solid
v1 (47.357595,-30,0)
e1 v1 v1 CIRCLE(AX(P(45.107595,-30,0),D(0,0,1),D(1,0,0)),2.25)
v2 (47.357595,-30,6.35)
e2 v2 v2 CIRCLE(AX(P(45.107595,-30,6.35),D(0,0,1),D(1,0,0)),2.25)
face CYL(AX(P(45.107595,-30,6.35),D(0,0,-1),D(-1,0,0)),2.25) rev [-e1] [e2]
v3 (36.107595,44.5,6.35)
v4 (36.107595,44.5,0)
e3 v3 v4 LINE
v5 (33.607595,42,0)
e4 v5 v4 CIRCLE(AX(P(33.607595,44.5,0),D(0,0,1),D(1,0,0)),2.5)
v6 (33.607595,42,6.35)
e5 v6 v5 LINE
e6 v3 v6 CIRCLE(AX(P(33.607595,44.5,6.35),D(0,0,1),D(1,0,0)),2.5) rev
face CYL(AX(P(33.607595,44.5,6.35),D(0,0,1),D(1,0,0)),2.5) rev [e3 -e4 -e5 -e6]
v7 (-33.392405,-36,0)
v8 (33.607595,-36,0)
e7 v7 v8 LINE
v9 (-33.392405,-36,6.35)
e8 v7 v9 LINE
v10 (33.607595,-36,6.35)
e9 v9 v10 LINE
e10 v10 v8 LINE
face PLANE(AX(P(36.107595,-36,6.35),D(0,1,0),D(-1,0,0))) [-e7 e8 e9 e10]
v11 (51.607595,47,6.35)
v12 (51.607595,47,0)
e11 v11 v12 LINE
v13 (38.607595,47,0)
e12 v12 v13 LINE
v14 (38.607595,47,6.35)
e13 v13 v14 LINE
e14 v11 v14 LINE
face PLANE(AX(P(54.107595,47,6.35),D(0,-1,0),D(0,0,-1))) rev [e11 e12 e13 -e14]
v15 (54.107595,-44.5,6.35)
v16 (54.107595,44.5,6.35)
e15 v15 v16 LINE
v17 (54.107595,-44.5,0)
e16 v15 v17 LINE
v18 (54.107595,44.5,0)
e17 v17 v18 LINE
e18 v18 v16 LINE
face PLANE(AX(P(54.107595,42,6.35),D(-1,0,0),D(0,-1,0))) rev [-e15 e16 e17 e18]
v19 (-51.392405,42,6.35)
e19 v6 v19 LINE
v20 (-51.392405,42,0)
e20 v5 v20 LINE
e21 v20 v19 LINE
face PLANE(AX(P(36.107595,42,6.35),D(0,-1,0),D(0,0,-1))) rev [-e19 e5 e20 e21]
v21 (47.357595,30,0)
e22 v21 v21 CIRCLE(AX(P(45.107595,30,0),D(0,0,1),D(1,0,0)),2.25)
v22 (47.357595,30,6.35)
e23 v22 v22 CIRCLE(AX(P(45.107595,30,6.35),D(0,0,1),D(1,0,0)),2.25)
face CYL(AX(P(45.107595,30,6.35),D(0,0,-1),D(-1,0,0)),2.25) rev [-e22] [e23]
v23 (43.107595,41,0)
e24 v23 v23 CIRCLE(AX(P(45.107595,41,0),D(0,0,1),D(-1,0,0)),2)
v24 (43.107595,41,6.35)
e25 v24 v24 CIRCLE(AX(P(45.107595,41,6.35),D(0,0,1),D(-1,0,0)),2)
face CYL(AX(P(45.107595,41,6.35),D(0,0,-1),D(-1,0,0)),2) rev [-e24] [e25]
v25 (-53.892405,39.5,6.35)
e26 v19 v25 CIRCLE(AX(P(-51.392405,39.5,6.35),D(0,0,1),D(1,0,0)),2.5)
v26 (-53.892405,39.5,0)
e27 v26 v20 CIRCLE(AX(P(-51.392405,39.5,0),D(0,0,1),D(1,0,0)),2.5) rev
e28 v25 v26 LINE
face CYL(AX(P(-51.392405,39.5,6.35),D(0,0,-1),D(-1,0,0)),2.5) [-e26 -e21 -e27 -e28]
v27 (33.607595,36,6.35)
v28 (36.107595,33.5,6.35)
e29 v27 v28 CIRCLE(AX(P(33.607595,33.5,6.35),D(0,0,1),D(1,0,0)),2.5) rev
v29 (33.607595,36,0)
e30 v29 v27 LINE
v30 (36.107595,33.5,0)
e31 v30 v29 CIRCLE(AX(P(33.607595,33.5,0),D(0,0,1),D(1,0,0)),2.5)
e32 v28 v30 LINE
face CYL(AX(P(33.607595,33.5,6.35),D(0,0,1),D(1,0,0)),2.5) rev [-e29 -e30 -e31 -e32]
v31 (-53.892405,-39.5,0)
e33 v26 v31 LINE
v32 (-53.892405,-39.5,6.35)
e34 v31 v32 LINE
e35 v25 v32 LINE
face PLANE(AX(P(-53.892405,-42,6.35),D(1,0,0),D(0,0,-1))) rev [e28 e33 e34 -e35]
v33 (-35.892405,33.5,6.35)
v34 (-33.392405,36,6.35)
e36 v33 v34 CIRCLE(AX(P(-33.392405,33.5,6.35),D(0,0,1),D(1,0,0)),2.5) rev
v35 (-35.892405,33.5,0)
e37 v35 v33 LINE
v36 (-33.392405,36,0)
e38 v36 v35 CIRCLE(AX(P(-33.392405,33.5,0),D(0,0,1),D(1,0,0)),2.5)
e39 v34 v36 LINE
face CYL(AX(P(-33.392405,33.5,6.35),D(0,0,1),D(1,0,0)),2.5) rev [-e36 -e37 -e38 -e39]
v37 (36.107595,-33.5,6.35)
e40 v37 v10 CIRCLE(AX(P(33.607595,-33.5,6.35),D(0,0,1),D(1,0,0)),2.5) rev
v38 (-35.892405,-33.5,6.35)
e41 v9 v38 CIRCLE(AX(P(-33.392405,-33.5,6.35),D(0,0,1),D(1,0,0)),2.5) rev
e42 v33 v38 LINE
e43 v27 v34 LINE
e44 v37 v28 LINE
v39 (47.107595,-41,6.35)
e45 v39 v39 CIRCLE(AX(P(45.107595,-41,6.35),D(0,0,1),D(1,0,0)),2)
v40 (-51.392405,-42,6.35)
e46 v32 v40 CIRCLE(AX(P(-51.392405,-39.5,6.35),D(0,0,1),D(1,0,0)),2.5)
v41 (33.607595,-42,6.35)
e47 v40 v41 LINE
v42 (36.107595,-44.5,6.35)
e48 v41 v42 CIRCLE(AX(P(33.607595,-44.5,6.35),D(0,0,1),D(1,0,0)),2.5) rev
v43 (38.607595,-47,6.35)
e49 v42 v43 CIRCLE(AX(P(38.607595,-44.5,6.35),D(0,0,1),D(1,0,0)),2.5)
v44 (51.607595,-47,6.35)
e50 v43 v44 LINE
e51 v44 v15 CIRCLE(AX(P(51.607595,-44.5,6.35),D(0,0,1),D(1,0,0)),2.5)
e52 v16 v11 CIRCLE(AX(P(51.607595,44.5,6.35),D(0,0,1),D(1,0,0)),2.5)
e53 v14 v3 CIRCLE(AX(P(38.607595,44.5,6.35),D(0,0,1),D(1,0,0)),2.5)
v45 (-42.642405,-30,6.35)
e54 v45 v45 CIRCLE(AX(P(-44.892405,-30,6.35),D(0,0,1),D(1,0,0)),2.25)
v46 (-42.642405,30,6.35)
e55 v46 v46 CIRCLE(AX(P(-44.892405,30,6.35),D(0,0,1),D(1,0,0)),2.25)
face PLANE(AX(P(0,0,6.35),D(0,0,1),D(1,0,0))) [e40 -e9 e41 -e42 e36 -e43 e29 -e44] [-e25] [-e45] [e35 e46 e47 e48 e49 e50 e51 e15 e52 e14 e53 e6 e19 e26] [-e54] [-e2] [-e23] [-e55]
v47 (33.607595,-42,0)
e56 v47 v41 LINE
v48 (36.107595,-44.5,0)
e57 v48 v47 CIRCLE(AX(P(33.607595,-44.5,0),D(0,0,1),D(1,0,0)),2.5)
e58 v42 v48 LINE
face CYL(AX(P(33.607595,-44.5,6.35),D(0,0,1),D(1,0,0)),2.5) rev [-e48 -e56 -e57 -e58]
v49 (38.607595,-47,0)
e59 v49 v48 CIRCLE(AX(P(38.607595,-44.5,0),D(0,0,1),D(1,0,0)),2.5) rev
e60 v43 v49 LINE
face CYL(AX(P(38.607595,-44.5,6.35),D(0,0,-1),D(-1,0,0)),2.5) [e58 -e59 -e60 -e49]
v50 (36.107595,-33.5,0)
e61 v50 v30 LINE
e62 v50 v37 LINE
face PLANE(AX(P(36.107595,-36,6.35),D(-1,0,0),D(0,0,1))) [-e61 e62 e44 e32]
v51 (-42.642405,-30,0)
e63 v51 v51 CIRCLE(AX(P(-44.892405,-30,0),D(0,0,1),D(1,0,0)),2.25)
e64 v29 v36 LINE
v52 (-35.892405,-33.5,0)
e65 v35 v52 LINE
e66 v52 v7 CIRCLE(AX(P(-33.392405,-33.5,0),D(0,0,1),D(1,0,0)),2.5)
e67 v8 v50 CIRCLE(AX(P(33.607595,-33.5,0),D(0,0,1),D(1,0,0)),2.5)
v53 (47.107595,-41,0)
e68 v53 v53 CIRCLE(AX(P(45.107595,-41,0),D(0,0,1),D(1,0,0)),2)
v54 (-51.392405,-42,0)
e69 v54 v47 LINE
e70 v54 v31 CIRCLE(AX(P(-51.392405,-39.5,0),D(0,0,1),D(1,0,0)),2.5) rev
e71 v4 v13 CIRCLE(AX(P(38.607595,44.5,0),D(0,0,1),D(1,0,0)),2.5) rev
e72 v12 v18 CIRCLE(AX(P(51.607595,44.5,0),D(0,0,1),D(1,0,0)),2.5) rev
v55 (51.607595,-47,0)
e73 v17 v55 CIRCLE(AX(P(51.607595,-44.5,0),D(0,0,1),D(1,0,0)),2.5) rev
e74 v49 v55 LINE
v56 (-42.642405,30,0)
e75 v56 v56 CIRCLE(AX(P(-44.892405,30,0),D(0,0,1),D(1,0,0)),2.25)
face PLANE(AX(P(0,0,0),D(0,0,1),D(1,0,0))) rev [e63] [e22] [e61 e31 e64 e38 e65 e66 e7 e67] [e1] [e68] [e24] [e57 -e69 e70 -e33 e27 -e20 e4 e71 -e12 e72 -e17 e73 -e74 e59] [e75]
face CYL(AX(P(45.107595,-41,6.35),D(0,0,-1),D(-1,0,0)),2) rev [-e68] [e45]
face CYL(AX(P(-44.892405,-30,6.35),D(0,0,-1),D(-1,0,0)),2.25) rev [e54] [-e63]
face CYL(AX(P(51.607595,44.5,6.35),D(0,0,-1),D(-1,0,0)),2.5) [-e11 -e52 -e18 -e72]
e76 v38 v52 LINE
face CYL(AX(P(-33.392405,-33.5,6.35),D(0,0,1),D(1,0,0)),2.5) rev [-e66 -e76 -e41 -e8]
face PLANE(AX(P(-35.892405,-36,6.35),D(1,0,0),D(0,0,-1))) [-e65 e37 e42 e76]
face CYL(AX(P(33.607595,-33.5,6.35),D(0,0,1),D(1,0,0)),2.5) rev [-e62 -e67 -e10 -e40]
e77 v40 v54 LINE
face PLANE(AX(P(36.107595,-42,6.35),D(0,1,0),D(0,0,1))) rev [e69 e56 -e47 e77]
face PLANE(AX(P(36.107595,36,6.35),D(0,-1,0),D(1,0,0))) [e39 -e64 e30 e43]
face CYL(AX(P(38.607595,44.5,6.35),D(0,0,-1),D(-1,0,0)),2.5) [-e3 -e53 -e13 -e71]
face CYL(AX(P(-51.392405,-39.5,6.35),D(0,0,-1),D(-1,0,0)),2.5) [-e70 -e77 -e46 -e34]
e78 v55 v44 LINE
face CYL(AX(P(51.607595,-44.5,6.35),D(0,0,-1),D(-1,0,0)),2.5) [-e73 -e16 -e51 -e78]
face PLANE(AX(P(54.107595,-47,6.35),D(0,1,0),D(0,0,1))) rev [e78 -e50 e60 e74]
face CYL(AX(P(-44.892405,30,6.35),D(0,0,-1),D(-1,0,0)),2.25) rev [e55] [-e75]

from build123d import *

# Parameters (mm, degrees)
SKETCH1_R           = 2.25
SKETCH1_R_2         = 2
SKETCH1_W           = 72
SKETCH1_H           = 72
BOSS_EXTRUDE1_DEPTH = 6.35
FILLET1_START       = -1
FILLET1_DEPTH       = 8
FILLET1_2_DEPTH     = 6.35


with BuildPart() as part:
    # Sketch1 → Boss-Extrude1 (new body)
    with BuildSketch(Plane.XY):
        Polygon((54.107594743, 42), (54.107594743, 47), (36.107594743, 47), (36.107594743, 42), (-53.892405257, 42), (-53.892405257, -42), (36.107594743, -42), (36.107594743, -47), (54.107594743, -47), (54.107594743, -42), align=None)
        with Locations((-44.892405257, 30)):
            Circle(SKETCH1_R, mode=Mode.SUBTRACT)
        with Locations((45.107594743, 30)):
            Circle(SKETCH1_R, mode=Mode.SUBTRACT)
        with Locations((45.107594743, -30)):
            Circle(SKETCH1_R, mode=Mode.SUBTRACT)
        with Locations((-44.892405257, -30)):
            Circle(SKETCH1_R, mode=Mode.SUBTRACT)
        with Locations((45.107594743, -41)):
            Circle(SKETCH1_R_2, mode=Mode.SUBTRACT)
        with Locations(Location((45.107594743, 41, 0), (0, 0, 180))):
            Circle(SKETCH1_R_2, mode=Mode.SUBTRACT)
        with Locations((0.107594743, 0)):
            Rectangle(SKETCH1_W, SKETCH1_H, mode=Mode.SUBTRACT)
    extrude(amount=BOSS_EXTRUDE1_DEPTH)

    # Fillet1: read off the stored shape, not the designer's step
    # Fillet1 outline → Fillet1 (cut)
    with BuildSketch(Plane.XY.offset(FILLET1_START)):
        with BuildLine():
            Line((36.107594743, 47), (36.107594743, 44.5))
            ThreePointArc((36.107594743, 44.5), (36.83982779, 46.267766953), (38.607594743, 47))
            Line((38.607594743, 47), (36.107594743, 47))
        make_face()
        with BuildLine():
            Line((54.107594743, 47), (51.607594743, 47))
            ThreePointArc((51.607594743, 47), (53.375361696, 46.267766953), (54.107594743, 44.5))
            Line((54.107594743, 44.5), (54.107594743, 47))
        make_face()
        with BuildLine():
            ThreePointArc((-53.892405257, 39.5), (-53.16017221, 41.267766953), (-51.392405257, 42))
            Line((-51.392405257, 42), (-53.892405257, 42))
            Line((-53.892405257, 42), (-53.892405257, 39.5))
        make_face()
        with BuildLine():
            Line((54.107594743, -47), (54.107594743, -44.5))
            ThreePointArc((54.107594743, -44.5), (53.375361696, -46.267766953), (51.607594743, -47))
            Line((51.607594743, -47), (54.107594743, -47))
        make_face()
        with BuildLine():
            ThreePointArc((-51.392405257, -42), (-53.16017221, -41.267766953), (-53.892405257, -39.5))
            Line((-53.892405257, -39.5), (-53.892405257, -42))
            Line((-53.892405257, -42), (-51.392405257, -42))
        make_face()
        with BuildLine():
            Line((36.107594743, -47), (38.607594743, -47))
            ThreePointArc((38.607594743, -47), (36.83982779, -46.267766953), (36.107594743, -44.5))
            Line((36.107594743, -44.5), (36.107594743, -47))
        make_face()
    extrude(amount=FILLET1_DEPTH, mode=Mode.SUBTRACT)

    # Fillet1 2 outline → Fillet1 2 (add)
    with BuildSketch(Plane.XY):
        with BuildLine():
            ThreePointArc((36.107594743, -33.5), (35.375361696, -35.267766953), (33.607594743, -36))
            Line((33.607594743, -36), (36.107594743, -36))
            Line((36.107594743, -36), (36.107594743, -33.5))
        make_face()
        with BuildLine():
            Line((-35.892405257, -36), (-33.392405257, -36))
            ThreePointArc((-33.392405257, -36), (-35.16017221, -35.267766953), (-35.892405257, -33.5))
            Line((-35.892405257, -33.5), (-35.892405257, -36))
        make_face()
        with BuildLine():
            ThreePointArc((33.607594743, 36), (35.375361696, 35.267766953), (36.107594743, 33.5))
            Line((36.107594743, 33.5), (36.107594743, 36))
            Line((36.107594743, 36), (33.607594743, 36))
        make_face()
        with BuildLine():
            Line((-35.892405257, 36), (-35.892405257, 33.5))
            ThreePointArc((-35.892405257, 33.5), (-35.16017221, 35.267766953), (-33.392405257, 36))
            Line((-33.392405257, 36), (-35.892405257, 36))
        make_face()
        with BuildLine():
            Line((36.107594743, 42), (36.107594743, 44.5))
            ThreePointArc((36.107594743, 44.5), (35.375361696, 42.732233047), (33.607594743, 42))
            Line((33.607594743, 42), (36.107594743, 42))
        make_face()
        with BuildLine():
            Line((36.107594743, -42), (33.607594743, -42))
            ThreePointArc((33.607594743, -42), (35.375361696, -42.732233047), (36.107594743, -44.5))
            Line((36.107594743, -44.5), (36.107594743, -42))
        make_face()
    extrude(amount=FILLET1_2_DEPTH)


solid = part.part
